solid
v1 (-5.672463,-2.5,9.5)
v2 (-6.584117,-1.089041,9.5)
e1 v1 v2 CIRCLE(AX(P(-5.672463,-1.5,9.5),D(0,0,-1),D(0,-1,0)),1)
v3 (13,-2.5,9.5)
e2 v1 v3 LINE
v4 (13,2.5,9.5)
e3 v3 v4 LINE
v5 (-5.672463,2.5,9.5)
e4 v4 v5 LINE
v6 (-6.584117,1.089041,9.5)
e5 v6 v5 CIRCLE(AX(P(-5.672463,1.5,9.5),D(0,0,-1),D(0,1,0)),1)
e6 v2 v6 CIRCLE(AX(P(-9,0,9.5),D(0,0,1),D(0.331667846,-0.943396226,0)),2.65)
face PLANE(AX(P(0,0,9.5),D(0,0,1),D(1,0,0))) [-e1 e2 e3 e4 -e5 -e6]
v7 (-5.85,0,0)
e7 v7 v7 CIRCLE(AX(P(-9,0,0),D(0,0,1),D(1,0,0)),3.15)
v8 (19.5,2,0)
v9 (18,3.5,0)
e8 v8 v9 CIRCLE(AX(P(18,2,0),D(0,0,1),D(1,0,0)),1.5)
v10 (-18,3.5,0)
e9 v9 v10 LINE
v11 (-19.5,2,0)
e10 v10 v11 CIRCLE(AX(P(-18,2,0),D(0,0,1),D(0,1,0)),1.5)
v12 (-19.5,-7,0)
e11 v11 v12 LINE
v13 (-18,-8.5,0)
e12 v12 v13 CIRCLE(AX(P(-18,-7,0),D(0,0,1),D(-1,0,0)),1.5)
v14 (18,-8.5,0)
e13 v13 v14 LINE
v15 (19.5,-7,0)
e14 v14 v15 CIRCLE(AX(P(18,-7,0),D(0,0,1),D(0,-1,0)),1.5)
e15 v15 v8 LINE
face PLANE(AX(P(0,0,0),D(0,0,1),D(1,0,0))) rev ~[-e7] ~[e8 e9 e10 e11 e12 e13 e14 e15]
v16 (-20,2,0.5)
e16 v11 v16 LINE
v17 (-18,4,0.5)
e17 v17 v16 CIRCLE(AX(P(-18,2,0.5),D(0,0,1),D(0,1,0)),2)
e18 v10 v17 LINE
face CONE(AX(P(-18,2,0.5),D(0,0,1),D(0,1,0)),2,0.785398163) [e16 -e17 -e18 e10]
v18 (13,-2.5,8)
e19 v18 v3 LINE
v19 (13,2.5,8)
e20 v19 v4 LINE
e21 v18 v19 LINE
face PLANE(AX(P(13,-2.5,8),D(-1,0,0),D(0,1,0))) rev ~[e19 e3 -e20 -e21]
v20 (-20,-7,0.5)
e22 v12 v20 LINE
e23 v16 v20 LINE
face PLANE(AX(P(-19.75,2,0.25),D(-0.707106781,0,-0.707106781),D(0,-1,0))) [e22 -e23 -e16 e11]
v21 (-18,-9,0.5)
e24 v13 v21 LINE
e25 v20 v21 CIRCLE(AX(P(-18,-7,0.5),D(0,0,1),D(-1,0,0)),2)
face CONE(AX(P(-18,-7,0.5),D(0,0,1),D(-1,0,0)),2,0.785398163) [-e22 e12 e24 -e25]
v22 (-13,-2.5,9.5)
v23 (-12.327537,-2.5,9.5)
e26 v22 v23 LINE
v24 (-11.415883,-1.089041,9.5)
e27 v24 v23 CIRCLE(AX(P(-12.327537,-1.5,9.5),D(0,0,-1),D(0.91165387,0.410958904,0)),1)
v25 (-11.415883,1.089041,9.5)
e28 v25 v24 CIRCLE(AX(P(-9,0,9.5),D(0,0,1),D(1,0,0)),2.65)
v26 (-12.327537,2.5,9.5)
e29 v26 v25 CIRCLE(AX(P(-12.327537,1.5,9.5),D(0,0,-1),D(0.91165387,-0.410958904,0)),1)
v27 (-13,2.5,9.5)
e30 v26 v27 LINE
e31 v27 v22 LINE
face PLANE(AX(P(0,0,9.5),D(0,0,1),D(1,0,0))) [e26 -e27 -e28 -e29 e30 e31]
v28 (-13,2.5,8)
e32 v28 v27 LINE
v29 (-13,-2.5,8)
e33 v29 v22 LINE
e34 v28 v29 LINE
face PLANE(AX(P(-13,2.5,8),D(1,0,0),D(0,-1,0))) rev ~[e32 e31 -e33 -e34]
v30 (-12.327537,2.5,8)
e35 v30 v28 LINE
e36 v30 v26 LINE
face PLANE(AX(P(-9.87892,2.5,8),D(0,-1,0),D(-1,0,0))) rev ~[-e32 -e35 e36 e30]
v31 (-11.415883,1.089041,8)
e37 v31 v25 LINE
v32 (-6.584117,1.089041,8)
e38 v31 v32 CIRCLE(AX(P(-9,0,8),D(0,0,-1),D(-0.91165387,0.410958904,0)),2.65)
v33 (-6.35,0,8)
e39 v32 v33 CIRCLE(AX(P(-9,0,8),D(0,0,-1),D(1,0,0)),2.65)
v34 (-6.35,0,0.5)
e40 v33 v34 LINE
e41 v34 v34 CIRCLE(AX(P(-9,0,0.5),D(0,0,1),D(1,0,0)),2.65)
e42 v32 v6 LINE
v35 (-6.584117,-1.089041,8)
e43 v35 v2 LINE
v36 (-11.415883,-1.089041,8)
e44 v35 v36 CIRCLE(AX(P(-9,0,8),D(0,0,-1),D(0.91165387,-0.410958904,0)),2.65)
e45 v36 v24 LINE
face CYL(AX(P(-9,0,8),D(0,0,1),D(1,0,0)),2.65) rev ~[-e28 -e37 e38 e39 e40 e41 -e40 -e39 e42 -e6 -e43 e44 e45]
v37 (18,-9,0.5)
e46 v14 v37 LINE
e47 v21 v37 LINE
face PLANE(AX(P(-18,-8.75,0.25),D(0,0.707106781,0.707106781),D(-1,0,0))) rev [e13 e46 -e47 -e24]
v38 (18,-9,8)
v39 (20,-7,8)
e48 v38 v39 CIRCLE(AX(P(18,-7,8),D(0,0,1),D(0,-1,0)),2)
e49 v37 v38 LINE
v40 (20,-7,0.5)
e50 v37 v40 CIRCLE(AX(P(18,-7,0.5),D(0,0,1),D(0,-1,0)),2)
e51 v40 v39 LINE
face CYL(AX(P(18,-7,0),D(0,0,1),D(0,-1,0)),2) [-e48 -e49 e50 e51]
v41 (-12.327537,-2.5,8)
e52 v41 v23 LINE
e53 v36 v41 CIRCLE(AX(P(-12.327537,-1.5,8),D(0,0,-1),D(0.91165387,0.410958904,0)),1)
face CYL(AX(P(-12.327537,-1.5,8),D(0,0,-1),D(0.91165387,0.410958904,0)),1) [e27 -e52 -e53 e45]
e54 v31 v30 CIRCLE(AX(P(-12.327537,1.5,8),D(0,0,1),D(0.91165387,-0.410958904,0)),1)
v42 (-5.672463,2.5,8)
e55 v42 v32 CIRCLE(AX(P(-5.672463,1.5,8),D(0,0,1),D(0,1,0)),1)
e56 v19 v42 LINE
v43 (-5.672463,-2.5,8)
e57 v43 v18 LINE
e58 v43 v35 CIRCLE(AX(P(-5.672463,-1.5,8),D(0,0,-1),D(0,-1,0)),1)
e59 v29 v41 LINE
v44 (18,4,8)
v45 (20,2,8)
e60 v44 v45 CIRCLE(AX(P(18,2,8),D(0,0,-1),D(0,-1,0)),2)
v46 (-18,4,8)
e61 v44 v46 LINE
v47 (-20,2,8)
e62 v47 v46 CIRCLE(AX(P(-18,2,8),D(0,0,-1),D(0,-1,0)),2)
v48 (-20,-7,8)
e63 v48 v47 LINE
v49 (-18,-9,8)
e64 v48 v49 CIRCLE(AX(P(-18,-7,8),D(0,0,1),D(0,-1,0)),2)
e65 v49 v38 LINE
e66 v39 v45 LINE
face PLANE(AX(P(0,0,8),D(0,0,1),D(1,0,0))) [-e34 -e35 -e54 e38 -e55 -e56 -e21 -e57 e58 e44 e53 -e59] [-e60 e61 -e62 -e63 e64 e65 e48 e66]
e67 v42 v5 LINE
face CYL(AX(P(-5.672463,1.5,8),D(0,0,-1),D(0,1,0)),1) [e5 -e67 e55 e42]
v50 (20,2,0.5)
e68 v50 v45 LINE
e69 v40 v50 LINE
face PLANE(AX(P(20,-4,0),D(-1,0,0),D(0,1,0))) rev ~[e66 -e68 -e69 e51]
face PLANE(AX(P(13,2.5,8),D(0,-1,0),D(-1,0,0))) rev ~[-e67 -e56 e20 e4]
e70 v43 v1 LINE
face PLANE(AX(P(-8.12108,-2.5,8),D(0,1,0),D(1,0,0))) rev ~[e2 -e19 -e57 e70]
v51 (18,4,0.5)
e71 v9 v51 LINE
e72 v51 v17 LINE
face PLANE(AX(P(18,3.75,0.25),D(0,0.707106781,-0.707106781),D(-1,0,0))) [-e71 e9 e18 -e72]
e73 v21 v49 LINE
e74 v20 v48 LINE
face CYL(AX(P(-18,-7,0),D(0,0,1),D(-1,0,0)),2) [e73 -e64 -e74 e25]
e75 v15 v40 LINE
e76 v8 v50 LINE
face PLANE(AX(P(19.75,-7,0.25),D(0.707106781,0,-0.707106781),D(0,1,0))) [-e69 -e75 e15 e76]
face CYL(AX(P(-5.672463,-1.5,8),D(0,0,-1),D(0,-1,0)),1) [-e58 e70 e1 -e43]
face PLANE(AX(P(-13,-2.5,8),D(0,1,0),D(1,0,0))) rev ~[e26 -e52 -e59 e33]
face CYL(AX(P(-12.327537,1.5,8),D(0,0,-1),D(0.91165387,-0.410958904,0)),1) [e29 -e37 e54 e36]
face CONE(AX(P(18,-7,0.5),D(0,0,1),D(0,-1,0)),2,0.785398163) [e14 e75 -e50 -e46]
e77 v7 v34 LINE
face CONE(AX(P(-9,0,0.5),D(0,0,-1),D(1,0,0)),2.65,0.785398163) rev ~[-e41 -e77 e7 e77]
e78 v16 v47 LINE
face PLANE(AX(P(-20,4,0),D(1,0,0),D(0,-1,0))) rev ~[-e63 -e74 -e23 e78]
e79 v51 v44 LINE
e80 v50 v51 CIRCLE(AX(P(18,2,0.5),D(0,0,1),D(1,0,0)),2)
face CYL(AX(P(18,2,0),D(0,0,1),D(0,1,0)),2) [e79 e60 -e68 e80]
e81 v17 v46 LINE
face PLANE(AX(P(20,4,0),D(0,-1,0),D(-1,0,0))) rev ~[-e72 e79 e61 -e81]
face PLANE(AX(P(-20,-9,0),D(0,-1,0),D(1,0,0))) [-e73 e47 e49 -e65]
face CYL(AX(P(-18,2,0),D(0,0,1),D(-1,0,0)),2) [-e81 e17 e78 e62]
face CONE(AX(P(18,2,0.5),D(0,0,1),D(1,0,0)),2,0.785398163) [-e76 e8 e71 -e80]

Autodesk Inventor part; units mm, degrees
ref_plane "YZ Plane" through (0, 0, 0) normal (1, 0, 0) x (0, 1, 0)
ref_plane "XZ Plane" through (0, 0, 0) normal (0, 1, 0) x (-1, 0, 0)
ref_plane "XY Plane" through (0, 0, 0) normal (0, 0, 1) x (1, 0, 0)
sketch "Sketch1" plane through (0, 0, 0) normal (0, 0, 1) x (1, 0, 0)
  line L0 (-20, -4) -> (20, -4)
  line L1 (20, -4) -> (20, 4)
  line L2 (20, 4) -> (-20, 4)
  line L3 (-20, 4) -> (-20, -4)
  line L4 (-20, -4) -> (20, 4) construction
  line L5 (20, -4) -> (-20, 4) construction
  point P0 (0, 0)
  dimension "d0" = 8
  dimension "d1" = 40
extrude "Extrusion1" add sketch "Sketch1" along normal blind 8
sketch "Sketch2" plane through (-20, -4, 0) normal (0, -1, 0) x (1, 0, 0)
  line L0 (0, 0) -> (40, 0) projected
  line L1 (40, 0) -> (40, 8) projected
  line L2 (0, 8) -> (40, 8) projected
  line L3 (0, 0) -> (0, 8) projected
  point P0 (20, 0)
extrude "Extrusion2" add sketch "Sketch2" along normal blind 5
sketch "Sketch3" plane through (0, 0, 8) normal (0, 0, 1) x (1, 0, 0)
  line L0 (-15, -3) -> (15, -3) construction
  line L1 (15, -3) -> (15, 3) construction
  line L2 (15, 3) -> (-15, 3) construction
  line L3 (-15, 3) -> (-15, -3) construction
  line L4 (-15, -3) -> (15, 3) construction
  line L5 (15, -3) -> (-15, 3) construction
  line L6 (-28, 0) -> (28, 0) projected
  circle A0 centre (-9, 0) radius 2.65
  point P0 (0, 0)
  dimension "d6" = 6
  dimension "d7" = 30
  dimension "d8" = 5.3
extrude "Extrusion3" cut sketch "Sketch3" against normal through all
sketch "Sketch4" plane through (0, 0, 8) normal (0, 0, 1) x (1, 0, 0)
  line L0 (-13, -2.5) -> (13, -2.5)
  line L1 (13, -2.5) -> (13, 2.5)
  line L2 (13, 2.5) -> (-13, 2.5)
  line L3 (-13, 2.5) -> (-13, -2.5)
  line L4 (-13, -2.5) -> (13, 2.5) construction
  line L5 (13, -2.5) -> (-13, 2.5) construction
  circle A0 centre (-9, 0) radius 2.65 projected
  point P0 (0, 0)
  point P1 (-8.1211, 2.5)
  point P2 (-8.1211, -2.5)
  point P3 (-9.8789, -2.5)
  point P4 (-9.8789, 2.5)
  dimension "d11" = 26
  dimension "d12" = 5
extrude "Extrusion4" add sketch "Sketch4" along normal blind 1.5 contours L3 L2 A0 L0 | A0 L2 L1 L0
fillet "Fillet1" radius 1 4 edges at (-9.8789, -2.5, 8.75) (-9.8789, 2.5, 8.75) (-8.1211, -2.5, 8.75) (-8.1211, 2.5, 8.75)
fillet "Fillet2" radius 2 4 edges at (-20, -9, 4) (-20, 4, 4) (20, -9, 4) (20, 4, 4)
chamfer "Chamfer1" distance 0.5 angle 45 9 edges at (0, -9, 0) (19.4142, -8.4142, 0) (20, -2.5, 0) (19.4142, 3.4142, 0) (0, 4, 0) (-19.4142, 3.4142, 0) (-20, -2.5, 0) (-19.4142, -8.4142, 0) (-11.65, 0, 0)
properties part number "SideHolderFix1"
